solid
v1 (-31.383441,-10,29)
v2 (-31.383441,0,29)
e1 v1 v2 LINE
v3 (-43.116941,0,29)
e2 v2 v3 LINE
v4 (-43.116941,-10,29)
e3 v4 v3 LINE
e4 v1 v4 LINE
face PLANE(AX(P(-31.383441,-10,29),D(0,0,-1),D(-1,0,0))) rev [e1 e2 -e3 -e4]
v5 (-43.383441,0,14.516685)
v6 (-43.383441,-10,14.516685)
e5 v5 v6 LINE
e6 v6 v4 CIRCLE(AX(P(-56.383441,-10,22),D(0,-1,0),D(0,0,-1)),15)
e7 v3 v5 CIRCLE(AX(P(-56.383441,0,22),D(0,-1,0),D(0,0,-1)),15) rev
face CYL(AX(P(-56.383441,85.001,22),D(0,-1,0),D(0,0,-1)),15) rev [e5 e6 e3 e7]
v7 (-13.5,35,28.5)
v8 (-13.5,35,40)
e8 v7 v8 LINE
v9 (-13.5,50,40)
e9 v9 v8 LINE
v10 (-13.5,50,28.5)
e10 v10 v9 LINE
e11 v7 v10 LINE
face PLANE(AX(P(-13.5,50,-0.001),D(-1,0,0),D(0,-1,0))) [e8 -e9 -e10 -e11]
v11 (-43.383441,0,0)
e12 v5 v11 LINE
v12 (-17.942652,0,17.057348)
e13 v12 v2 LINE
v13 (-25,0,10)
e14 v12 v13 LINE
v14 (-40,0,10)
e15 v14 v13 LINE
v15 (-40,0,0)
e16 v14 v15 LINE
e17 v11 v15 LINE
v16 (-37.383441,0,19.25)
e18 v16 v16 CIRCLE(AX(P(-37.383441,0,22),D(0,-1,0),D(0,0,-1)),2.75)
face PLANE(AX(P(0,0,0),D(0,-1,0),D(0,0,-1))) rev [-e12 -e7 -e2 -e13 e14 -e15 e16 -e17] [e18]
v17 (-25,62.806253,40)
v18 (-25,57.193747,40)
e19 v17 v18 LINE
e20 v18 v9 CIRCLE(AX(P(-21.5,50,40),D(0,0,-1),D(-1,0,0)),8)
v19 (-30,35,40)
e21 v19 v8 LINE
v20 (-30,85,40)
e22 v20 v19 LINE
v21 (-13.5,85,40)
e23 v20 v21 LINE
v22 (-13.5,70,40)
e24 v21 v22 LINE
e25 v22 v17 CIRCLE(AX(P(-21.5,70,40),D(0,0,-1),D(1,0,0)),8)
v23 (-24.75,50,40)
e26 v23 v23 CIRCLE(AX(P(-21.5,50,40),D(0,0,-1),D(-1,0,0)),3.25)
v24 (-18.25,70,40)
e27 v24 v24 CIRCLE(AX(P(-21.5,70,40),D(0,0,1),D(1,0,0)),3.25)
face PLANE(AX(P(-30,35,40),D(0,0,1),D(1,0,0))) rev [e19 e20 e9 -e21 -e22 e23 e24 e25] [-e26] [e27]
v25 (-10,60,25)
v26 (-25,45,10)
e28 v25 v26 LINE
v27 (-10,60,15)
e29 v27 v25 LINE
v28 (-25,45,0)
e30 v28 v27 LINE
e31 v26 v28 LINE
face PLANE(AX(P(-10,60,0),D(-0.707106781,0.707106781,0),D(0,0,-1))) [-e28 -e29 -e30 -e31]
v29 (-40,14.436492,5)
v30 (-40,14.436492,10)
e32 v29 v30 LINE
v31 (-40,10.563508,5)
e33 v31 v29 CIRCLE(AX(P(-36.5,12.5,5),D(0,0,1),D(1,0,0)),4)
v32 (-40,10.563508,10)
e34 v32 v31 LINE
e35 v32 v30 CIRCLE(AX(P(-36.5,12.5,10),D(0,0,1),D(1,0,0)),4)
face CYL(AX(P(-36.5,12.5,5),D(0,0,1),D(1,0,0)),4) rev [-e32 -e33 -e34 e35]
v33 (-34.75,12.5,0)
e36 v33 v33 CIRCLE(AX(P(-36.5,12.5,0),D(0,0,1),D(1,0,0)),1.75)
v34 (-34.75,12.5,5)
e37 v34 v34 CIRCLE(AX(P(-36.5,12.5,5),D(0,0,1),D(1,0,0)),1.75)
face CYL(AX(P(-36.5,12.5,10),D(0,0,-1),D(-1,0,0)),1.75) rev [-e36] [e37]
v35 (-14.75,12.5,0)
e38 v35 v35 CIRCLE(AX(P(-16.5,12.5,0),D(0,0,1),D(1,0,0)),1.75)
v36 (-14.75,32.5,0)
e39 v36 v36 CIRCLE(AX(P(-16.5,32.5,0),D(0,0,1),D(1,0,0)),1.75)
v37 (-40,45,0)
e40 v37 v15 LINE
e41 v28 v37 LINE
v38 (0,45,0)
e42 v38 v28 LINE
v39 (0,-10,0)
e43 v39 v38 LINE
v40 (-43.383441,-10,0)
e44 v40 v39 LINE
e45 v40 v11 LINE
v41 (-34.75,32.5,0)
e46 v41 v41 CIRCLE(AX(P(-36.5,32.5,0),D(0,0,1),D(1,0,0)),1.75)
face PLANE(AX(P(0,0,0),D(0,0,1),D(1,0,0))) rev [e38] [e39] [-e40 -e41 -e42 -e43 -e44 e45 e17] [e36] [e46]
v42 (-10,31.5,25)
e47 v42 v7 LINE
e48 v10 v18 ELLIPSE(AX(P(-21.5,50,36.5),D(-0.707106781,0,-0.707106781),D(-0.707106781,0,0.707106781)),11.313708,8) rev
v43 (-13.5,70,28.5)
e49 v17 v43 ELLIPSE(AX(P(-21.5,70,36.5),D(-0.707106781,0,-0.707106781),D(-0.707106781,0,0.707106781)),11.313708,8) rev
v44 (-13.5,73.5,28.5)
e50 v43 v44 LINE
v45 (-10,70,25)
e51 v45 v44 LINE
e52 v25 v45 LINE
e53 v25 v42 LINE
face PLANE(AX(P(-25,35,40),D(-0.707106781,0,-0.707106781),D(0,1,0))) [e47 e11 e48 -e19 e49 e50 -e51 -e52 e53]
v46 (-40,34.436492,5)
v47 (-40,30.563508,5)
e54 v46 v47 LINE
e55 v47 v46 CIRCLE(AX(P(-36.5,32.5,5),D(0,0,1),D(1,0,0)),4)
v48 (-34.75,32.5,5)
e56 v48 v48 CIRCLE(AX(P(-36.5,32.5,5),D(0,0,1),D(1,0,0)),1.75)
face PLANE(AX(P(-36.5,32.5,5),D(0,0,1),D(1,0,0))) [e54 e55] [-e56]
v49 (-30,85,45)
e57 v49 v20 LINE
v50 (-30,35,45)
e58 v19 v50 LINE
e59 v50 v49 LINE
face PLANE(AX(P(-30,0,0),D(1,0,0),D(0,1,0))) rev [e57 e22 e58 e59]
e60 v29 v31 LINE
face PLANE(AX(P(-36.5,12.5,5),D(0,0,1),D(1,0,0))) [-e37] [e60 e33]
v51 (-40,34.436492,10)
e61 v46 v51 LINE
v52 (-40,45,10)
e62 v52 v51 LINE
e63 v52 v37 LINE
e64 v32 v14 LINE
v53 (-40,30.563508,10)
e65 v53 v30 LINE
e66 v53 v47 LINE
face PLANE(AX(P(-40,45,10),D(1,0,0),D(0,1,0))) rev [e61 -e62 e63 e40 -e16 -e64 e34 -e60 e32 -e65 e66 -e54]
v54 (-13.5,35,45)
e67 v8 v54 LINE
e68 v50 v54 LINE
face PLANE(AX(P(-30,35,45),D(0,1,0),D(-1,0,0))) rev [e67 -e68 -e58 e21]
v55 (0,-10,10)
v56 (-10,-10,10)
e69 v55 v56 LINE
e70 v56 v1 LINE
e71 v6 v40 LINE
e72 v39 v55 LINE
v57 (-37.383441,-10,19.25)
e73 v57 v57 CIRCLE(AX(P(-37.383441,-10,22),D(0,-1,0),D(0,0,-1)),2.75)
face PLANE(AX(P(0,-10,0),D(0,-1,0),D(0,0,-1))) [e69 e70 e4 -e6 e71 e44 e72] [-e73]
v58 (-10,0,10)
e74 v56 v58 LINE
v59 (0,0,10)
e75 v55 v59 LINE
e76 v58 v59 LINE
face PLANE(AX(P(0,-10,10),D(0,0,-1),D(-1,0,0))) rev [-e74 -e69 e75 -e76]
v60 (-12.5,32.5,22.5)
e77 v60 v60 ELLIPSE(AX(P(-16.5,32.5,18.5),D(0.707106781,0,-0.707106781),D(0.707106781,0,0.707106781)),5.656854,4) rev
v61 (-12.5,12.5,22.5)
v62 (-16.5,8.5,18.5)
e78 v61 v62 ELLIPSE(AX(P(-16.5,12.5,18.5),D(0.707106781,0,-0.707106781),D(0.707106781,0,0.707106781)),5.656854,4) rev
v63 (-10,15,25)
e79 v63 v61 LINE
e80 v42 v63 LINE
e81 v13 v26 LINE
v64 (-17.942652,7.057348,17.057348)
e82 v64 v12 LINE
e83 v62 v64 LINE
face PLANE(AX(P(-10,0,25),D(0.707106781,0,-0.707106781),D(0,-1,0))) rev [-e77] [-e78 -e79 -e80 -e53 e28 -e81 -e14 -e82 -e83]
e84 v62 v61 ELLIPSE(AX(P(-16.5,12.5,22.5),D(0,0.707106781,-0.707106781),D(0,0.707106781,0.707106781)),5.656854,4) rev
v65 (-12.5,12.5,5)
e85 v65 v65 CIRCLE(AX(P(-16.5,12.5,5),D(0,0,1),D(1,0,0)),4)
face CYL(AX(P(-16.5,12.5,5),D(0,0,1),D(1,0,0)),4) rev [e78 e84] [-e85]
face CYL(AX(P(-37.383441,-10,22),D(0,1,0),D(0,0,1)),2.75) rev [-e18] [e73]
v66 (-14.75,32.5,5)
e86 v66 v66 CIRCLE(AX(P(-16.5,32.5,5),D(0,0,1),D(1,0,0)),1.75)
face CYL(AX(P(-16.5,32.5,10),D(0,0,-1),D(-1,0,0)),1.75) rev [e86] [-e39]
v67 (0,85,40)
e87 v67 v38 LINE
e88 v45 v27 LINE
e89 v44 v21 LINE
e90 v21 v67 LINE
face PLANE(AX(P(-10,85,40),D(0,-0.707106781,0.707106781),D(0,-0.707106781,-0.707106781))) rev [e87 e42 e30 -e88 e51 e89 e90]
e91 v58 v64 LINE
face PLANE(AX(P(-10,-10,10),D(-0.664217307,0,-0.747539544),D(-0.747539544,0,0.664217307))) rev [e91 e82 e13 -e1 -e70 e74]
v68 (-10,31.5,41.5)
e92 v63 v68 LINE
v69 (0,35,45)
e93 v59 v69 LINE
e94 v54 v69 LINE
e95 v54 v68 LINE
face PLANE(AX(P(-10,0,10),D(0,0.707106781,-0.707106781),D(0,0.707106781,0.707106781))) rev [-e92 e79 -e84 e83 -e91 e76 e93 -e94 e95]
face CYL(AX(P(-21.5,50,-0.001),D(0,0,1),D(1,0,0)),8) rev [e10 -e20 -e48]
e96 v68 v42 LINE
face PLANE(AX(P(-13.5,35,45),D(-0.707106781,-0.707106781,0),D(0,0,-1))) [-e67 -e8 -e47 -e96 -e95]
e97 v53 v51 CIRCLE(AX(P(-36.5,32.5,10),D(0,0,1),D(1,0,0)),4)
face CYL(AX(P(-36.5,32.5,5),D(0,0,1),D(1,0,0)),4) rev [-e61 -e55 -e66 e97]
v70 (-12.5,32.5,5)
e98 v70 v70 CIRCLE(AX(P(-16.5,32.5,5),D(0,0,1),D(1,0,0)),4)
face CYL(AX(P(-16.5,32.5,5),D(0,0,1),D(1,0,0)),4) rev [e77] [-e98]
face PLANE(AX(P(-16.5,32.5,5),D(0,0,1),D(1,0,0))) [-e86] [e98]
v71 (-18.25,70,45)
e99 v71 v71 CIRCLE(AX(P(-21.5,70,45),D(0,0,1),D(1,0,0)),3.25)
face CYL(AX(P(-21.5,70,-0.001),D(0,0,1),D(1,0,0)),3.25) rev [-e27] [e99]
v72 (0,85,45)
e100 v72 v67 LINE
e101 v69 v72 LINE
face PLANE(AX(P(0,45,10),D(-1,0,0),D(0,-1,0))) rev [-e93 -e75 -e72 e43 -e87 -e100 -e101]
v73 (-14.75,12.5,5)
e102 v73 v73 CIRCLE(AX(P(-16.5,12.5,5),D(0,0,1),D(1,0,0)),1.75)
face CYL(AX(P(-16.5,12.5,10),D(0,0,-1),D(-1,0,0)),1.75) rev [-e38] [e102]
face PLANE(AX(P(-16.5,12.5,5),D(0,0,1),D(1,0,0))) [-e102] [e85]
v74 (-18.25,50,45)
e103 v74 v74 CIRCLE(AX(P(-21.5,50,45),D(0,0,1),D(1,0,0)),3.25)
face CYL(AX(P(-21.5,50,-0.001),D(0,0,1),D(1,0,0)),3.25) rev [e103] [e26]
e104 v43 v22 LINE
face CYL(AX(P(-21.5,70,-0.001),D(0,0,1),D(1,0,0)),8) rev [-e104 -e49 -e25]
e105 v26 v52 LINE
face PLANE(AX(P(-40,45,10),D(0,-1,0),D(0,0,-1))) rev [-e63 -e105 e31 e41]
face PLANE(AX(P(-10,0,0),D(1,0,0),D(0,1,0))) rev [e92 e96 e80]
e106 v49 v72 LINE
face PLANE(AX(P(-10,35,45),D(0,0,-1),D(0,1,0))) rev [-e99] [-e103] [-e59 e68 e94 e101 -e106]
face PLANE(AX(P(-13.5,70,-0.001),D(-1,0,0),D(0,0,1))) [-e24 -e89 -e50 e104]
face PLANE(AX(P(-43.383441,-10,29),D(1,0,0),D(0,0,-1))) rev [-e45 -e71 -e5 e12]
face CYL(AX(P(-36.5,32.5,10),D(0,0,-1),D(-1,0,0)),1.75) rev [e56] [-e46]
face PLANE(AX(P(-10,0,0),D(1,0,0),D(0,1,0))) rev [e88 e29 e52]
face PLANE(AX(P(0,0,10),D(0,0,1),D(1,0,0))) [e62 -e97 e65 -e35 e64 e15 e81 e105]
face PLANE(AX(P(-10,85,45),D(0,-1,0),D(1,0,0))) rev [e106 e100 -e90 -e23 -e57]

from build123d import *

# Parameters (mm, degrees)
ESQUISSE1_W             = 40
ESQUISSE1_H             = 45
ESQUISSE1_R             = 1.75
BOSS_EXTRU_1_DEPTH      = 10
ESQUISSE2_R             = 4
ENL_V_MAT_EXTRU_2_DEPTH = 5
BOSS_EXTRU_2_DEPTH      = 10
ESQUISSE4_W             = 5
ESQUISSE4_H             = 50
BOSS_EXTRU_3_DEPTH      = 20
ENL_V_MAT_EXTRU_3_REACH = 106.163
ESQUISSE5_R             = 3.25
ESQUISSE7_R             = 2.75
BOSS_EXTRU_4_DEPTH      = 10
ENL_V_MAT_EXTRU_5_REACH = 115.719
ESQUISSE8_R             = 15
CHANFREIN1_SIZE         = 15
ENL_V_MAT_EXTRU_4_REACH = 105.475
CHANFREIN3_SIZE         = 3.5


with BuildPart() as part:
    # Esquisse1 → Boss.-Extru.1 (new body)
    with BuildSketch(Plane.XY):
        with Locations((-20, 22.5)):
            Rectangle(ESQUISSE1_W, ESQUISSE1_H)
        with Locations((-16.5, 32.5)):
            Circle(ESQUISSE1_R, mode=Mode.SUBTRACT)
        with Locations((-36.5, 32.5)):
            Circle(ESQUISSE1_R, mode=Mode.SUBTRACT)
        with Locations((-36.5, 12.5)):
            Circle(ESQUISSE1_R, mode=Mode.SUBTRACT)
        with Locations((-16.5, 12.5)):
            Circle(ESQUISSE1_R, mode=Mode.SUBTRACT)
    extrude(amount=BOSS_EXTRU_1_DEPTH)

    # Esquisse2 → Enlèv. mat.-Extru.2 (cut)
    with BuildSketch(Plane.XY.offset(10)):
        with Locations((-36.5, 32.5)):
            Circle(ESQUISSE2_R)
        with Locations((-16.5, 32.5)):
            Circle(ESQUISSE2_R)
        with Locations((-36.5, 12.5)):
            Circle(ESQUISSE2_R)
        with Locations((-16.5, 12.5)):
            Circle(ESQUISSE2_R)
    extrude(amount=-ENL_V_MAT_EXTRU_2_DEPTH, mode=Mode.SUBTRACT)

    # Esquisse3 → Boss.-Extru.2 (add)
    with BuildSketch(Plane.ZY):
        Polygon((10, 0), (45, 35), (45, 85), (40, 85), (0, 45), (10, 45), align=None)
    extrude(amount=BOSS_EXTRU_2_DEPTH)

    # Esquisse4 → Boss.-Extru.3 (add)
    with BuildSketch(Plane.ZY.offset(10)):
        with Locations((42.5, 60)):
            Rectangle(ESQUISSE4_W, ESQUISSE4_H)
    extrude(amount=BOSS_EXTRU_3_DEPTH)

    # Esquisse5 → Enlèv. mat.-Extru.3 (cut, up to next)
    with BuildSketch(Plane.XY.offset(45), mode=Mode.PRIVATE) as enl_v_mat_extru_3_sk1:
        with Locations((-21.5, 70)):
            Circle(ESQUISSE5_R)
    enl_v_mat_extru_3_tool1 = extrude(enl_v_mat_extru_3_sk1.sketch, amount=-ENL_V_MAT_EXTRU_3_REACH, mode=Mode.PRIVATE) & part.part
    # Esquisse5 → Enlèv. mat.-Extru.3 (cut, up to next)
    with BuildSketch(Plane.XY.offset(45), mode=Mode.PRIVATE) as enl_v_mat_extru_3_sk2:
        with Locations((-21.5, 50)):
            Circle(ESQUISSE5_R)
    enl_v_mat_extru_3_tool2 = extrude(enl_v_mat_extru_3_sk2.sketch, amount=-ENL_V_MAT_EXTRU_3_REACH, mode=Mode.PRIVATE) & part.part
    add(enl_v_mat_extru_3_tool1.solids().sort_by_distance((-21.5, 70, 45))[0], mode=Mode.SUBTRACT)
    add(enl_v_mat_extru_3_tool2.solids().sort_by_distance((-21.5, 50, 45))[0], mode=Mode.SUBTRACT)

    # Esquisse7 → Boss.-Extru.4 (add)
    with BuildSketch(Plane.XZ):
        Polygon((0, 0), (0, 10), (-10, 10), (-31.3834406, 29), (-43.3834406, 29), (-43.3834406, 0), align=None)
        with Locations(Location((-37.3834406, 22, 0), (0, 0, 270))):
            Circle(ESQUISSE7_R, mode=Mode.SUBTRACT)
    extrude(amount=BOSS_EXTRU_4_DEPTH)

    # Esquisse8 → Enlèv. mat.-Extru.5 (cut, up to next)
    with BuildSketch(Plane.XZ.offset(10), mode=Mode.PRIVATE) as enl_v_mat_extru_5_sk1:
        with Locations((-56.3834406, 22)):
            Circle(ESQUISSE8_R)
    enl_v_mat_extru_5_tool1 = extrude(enl_v_mat_extru_5_sk1.sketch, amount=-ENL_V_MAT_EXTRU_5_REACH, mode=Mode.PRIVATE) & part.part
    add(enl_v_mat_extru_5_tool1.solids().sort_by_distance((-56.383441, -10, 22))[0], mode=Mode.SUBTRACT)

    # Chanfrein1
    # the kernel refuses this chamfer: 15 mm, written as the material it adds along each edge
    with BuildSketch(Plane(origin=(-10, 35, 40), x_dir=(0, 0, -1), z_dir=(0, 1, 0))) as chanfrein1_piece_1_section:
        Polygon((CHANFREIN1_SIZE, 0), (0, CHANFREIN1_SIZE), (0, 0), align=None)
    chanfrein1_piece_1 = extrude(amount=88.575244819, mode=Mode.PRIVATE)
    chanfrein1_piece_1 = split(chanfrein1_piece_1, bisect_by=Plane(origin=(-10, 60, 15), z_dir=(0, -0.707106781186543, 0.7071067811865521)), keep=Keep.TOP, mode=Mode.PRIVATE)
    chanfrein1_piece_1 = chanfrein1_piece_1 - Plane(origin=(-21.5, 50, 40), x_dir=(1, 0, 0), z_dir=(0, 0, 1)) * Cylinder(3.25, 238, mode=Mode.PRIVATE)
    chanfrein1_piece_1 = chanfrein1_piece_1 - Plane(origin=(-21.5, 70, 40), x_dir=(1, 0, 0), z_dir=(0, 0, 1)) * Cylinder(3.25, 238, mode=Mode.PRIVATE)
    add(chanfrein1_piece_1)
    with BuildSketch(Plane(origin=(-10, 83.575244819, 10), x_dir=(0, 0, 1), z_dir=(0, -1, 0))) as chanfrein1_piece_2_section:
        Polygon((CHANFREIN1_SIZE, 0), (0, CHANFREIN1_SIZE), (0, 0), align=None)
    chanfrein1_piece_2 = extrude(amount=122.150489639, mode=Mode.PRIVATE)
    chanfrein1_piece_2 = split(chanfrein1_piece_2, bisect_by=Plane(origin=(-10, 69.28762241, 24.28762241), z_dir=(0, -0.707106781186543, 0.7071067811865521)), keep=Keep.TOP, mode=Mode.PRIVATE)
    chanfrein1_piece_2 = split(chanfrein1_piece_2, bisect_by=Plane(origin=(-10, 41.78762241, 51.78762241), z_dir=(0, 0.7071067811865328, -0.7071067811865622)), keep=Keep.TOP, mode=Mode.PRIVATE)
    chanfrein1_piece_2 = chanfrein1_piece_2 - Plane(origin=(-16.5, 12.5, 10), x_dir=(1, 0, 0), z_dir=(0, 0, 1)) * Cylinder(4, 305, mode=Mode.PRIVATE)
    chanfrein1_piece_2 = chanfrein1_piece_2 - Plane(origin=(-16.5, 32.5, 10), x_dir=(1, 0, 0), z_dir=(0, 0, 1)) * Cylinder(4, 305, mode=Mode.PRIVATE)
    chanfrein1_piece_2 = split(chanfrein1_piece_2, bisect_by=Plane(origin=(1.78762241, 71.78762241, 10), z_dir=(0.7071067811865477, -0.7071067811865474, 0)), keep=Keep.TOP, mode=Mode.PRIVATE)
    add(chanfrein1_piece_2)
    with BuildSketch(Plane(origin=(-10, 83.575244819, 10), x_dir=(0, 0, 1), z_dir=(0, -1, 0))) as chanfrein1_piece_3_section:
        Polygon((CHANFREIN1_SIZE, 0), (0, CHANFREIN1_SIZE), (0, 0), align=None)
    chanfrein1_piece_3 = extrude(amount=83.575244819, mode=Mode.PRIVATE)
    chanfrein1_piece_3 = split(chanfrein1_piece_3, bisect_by=Plane(origin=(-10, 41.78762241, 51.78762241), z_dir=(0, -0.7071067811865328, 0.7071067811865622)), keep=Keep.TOP, mode=Mode.PRIVATE)
    chanfrein1_piece_3 = split(chanfrein1_piece_3, bisect_by=Plane(origin=(-10, 83.575244819, 10), z_dir=(-0.6642173069108601, 0, -0.7475395435694919)), keep=Keep.TOP, mode=Mode.PRIVATE)
    add(chanfrein1_piece_3)
    with BuildSketch(Plane(origin=(-10, 45, -38.575244819), x_dir=(-1, 0, 0), z_dir=(0, 0, 1))) as chanfrein1_piece_4_section:
        Polygon((CHANFREIN1_SIZE, 0), (0, -CHANFREIN1_SIZE), (0, 0), align=None)
    chanfrein1_piece_4 = extrude(amount=87.150489639, mode=Mode.PRIVATE)
    chanfrein1_piece_4 = split(chanfrein1_piece_4, bisect_by=Plane(origin=(-10, 25.71237759, -19.28762241), z_dir=(0, -0.707106781186543, 0.7071067811865521)), keep=Keep.TOP, mode=Mode.PRIVATE)
    chanfrein1_piece_4 = split(chanfrein1_piece_4, bisect_by=Plane(origin=(-41.78762241, 45, -6.78762241), z_dir=(0.7071067811865476, 0, -0.7071067811865476)), keep=Keep.TOP, mode=Mode.PRIVATE)
    add(chanfrein1_piece_4)

    # Esquisse6 → Enlèv. mat.-Extru.4 (cut, up to next)
    with BuildSketch(Plane(origin=(0, 0, 40), x_dir=(-1, 0, 0), z_dir=(0, 0, -1)), mode=Mode.PRIVATE) as enl_v_mat_extru_4_sk1:
        with BuildLine():
            Line((13.5, 70), (13.5, 85))
            Line((13.5, 85), (29.5, 85))
            Line((29.5, 85), (29.5, 70))
            ThreePointArc((29.5, 70), (21.5, 62), (13.5, 70))
        make_face()
    enl_v_mat_extru_4_tool1 = extrude(enl_v_mat_extru_4_sk1.sketch, amount=ENL_V_MAT_EXTRU_4_REACH, mode=Mode.PRIVATE) & part.part
    # Esquisse6 → Enlèv. mat.-Extru.4 (cut, up to next)
    with BuildSketch(Plane(origin=(0, 0, 40), x_dir=(-1, 0, 0), z_dir=(0, 0, -1)), mode=Mode.PRIVATE) as enl_v_mat_extru_4_sk2:
        with BuildLine():
            Line((29.5, 50), (29.5, 35))
            Line((29.5, 35), (13.5, 35))
            Line((13.5, 35), (13.5, 50))
            ThreePointArc((13.5, 50), (21.5, 58), (29.5, 50))
        make_face()
    enl_v_mat_extru_4_tool2 = extrude(enl_v_mat_extru_4_sk2.sketch, amount=ENL_V_MAT_EXTRU_4_REACH, mode=Mode.PRIVATE) & part.part
    add(enl_v_mat_extru_4_tool1.solids().sort_by_distance((-21.5, 74.283507, 40))[0], mode=Mode.SUBTRACT)
    add(enl_v_mat_extru_4_tool2.solids().sort_by_distance((-21.5, 45.716493, 40))[0], mode=Mode.SUBTRACT)

    # Chanfrein3
    # the kernel refuses this chamfer: 3.5 mm, written as the material it adds along each edge
    with BuildSketch(Plane(origin=(-10, 35, 15.999109542), x_dir=(0, -1, 0), z_dir=(0, 0, 1))) as chanfrein3_piece_1_section:
        Polygon((CHANFREIN3_SIZE, 0), (0, -CHANFREIN3_SIZE), (0, 0), align=None)
    chanfrein3_piece_1 = extrude(amount=38.001780916, mode=Mode.PRIVATE)
    chanfrein3_piece_1 = split(chanfrein3_piece_1, bisect_by=Plane(origin=(-10, 20.499554771, 30.499554771), z_dir=(0, 0.7071067811865476, -0.7071067811865476)), keep=Keep.TOP, mode=Mode.PRIVATE)
    chanfrein3_piece_1 = split(chanfrein3_piece_1, bisect_by=Plane(origin=(-5.499554771, 35, 20.499554771), z_dir=(0.7071067811865476, 0, 0.7071067811865476)), keep=Keep.TOP, mode=Mode.PRIVATE)
    add(chanfrein3_piece_1)


solid = part.part
